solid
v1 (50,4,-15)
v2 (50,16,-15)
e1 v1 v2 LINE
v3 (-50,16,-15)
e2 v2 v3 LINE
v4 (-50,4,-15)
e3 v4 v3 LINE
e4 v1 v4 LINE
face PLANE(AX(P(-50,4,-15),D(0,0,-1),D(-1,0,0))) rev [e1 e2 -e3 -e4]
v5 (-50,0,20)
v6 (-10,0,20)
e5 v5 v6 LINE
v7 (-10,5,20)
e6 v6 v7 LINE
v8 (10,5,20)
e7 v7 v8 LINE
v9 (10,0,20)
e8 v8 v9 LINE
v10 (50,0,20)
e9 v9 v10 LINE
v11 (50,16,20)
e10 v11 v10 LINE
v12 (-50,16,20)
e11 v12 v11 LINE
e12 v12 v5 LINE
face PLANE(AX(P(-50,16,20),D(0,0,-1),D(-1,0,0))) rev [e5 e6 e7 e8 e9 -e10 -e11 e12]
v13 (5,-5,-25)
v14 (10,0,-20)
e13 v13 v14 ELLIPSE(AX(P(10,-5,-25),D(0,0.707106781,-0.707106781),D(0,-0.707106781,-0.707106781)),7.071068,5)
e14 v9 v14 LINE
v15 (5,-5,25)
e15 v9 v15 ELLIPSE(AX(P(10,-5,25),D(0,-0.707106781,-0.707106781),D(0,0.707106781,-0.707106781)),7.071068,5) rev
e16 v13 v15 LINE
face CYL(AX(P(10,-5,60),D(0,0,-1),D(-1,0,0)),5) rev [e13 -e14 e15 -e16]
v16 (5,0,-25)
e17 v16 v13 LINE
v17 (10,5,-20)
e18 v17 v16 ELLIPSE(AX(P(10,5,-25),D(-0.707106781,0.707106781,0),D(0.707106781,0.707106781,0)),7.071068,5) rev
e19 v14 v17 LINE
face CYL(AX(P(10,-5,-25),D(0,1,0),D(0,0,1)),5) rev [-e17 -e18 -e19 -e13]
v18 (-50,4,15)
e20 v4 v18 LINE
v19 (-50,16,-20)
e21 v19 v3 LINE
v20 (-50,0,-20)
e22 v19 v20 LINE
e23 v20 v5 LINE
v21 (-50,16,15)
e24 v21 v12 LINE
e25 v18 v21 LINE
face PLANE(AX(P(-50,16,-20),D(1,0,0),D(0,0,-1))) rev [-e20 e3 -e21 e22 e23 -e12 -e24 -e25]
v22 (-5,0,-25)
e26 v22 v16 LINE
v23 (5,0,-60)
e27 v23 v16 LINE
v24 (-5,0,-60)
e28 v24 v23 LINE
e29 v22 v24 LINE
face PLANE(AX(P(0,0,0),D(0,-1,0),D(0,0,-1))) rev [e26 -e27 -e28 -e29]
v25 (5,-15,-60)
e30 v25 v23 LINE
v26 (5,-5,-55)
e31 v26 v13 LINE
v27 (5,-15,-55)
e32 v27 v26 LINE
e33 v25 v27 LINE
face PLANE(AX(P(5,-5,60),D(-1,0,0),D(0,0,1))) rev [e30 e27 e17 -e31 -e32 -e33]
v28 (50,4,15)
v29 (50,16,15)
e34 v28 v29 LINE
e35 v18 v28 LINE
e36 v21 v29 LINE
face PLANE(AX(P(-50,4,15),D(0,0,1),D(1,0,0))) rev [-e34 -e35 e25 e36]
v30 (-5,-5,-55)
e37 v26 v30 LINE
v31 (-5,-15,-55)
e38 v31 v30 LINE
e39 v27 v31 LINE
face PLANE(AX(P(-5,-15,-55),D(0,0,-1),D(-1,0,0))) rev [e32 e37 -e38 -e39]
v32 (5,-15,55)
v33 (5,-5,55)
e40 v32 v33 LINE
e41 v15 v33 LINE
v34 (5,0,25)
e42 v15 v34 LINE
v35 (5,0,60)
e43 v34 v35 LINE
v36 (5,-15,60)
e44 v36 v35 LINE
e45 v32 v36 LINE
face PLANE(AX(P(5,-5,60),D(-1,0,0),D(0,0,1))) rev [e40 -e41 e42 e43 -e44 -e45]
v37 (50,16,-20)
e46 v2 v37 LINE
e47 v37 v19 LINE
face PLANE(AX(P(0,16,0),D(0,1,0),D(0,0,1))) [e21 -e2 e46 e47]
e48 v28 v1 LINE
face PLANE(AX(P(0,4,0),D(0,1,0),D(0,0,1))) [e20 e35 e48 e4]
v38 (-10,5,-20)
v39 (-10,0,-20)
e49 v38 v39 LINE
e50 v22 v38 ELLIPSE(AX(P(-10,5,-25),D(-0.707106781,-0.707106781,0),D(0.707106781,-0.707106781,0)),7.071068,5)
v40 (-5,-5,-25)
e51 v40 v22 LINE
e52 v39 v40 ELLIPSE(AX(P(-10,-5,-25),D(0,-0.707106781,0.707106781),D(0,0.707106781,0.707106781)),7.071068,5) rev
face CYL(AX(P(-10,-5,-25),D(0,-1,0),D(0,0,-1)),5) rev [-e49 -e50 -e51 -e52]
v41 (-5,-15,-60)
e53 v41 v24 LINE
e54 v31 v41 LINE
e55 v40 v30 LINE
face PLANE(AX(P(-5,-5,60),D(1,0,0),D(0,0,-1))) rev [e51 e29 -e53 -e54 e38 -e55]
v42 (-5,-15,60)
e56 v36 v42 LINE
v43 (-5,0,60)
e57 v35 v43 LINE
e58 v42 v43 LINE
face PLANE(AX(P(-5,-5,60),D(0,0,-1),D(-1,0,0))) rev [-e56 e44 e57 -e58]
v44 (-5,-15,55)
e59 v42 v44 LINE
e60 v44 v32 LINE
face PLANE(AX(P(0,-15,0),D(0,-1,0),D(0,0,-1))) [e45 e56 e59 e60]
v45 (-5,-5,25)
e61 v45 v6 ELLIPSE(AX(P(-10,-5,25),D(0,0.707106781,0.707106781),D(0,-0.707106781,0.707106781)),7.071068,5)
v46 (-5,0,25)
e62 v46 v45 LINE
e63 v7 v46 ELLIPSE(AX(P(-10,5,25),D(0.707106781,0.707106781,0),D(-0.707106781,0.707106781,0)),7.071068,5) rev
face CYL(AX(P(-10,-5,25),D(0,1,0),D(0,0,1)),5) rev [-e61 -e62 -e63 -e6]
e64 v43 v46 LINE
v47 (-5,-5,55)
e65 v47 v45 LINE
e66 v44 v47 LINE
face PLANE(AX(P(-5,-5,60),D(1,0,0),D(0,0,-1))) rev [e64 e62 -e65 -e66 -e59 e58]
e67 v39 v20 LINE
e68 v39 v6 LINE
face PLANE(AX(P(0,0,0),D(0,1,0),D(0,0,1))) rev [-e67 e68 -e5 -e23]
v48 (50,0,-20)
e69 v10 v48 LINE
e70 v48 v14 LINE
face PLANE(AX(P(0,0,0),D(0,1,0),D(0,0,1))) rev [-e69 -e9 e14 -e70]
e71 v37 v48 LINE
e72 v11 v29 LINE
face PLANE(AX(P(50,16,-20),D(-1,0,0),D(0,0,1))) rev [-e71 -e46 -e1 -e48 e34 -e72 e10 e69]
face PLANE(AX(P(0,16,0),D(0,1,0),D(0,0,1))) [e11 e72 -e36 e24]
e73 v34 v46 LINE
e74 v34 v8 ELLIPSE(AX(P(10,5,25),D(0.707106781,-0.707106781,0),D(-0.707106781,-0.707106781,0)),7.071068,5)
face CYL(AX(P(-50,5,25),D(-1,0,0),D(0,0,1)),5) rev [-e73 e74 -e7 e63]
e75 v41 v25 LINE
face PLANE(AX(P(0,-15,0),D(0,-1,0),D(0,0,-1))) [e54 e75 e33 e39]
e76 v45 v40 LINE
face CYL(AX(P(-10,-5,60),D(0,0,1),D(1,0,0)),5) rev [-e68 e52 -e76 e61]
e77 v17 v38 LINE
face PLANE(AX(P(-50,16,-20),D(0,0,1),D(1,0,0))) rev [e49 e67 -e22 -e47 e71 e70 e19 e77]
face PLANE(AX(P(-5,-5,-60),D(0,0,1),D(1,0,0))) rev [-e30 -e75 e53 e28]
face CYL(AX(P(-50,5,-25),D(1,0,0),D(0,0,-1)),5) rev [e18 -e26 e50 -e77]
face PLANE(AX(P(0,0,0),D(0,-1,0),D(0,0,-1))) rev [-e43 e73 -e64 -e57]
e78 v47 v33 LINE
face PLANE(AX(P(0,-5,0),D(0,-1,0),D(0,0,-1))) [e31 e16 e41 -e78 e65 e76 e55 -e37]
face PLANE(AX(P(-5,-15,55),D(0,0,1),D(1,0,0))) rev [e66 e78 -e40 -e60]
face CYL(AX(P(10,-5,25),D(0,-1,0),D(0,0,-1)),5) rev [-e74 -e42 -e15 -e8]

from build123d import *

# Parameters (mm, degrees)
SKETCH1_W           = 100
SKETCH1_H           = 40
BOSS_EXTRUDE2_DEPTH = 16
SKETCH3_W           = 100
SKETCH3_H           = 30
CUT_EXTRUDE1_DEPTH  = 12
SKETCH4_W           = 10
SKETCH4_H           = 120
BOSS_EXTRUDE3_DEPTH = 5
SKETCH5_W           = 10
SKETCH5_H           = 5
BOSS_EXTRUDE4_DEPTH = 10
SKETCH6_W           = 10
SKETCH6_H           = 5
BOSS_EXTRUDE5_DEPTH = 10
FILLET1_R           = 5
FILLET2_R           = 5
FILLET3_R           = 5


with BuildPart() as part:
    # Sketch1 → Boss-Extrude2 (new body)
    with BuildSketch(Plane(origin=(0, 0, 0), x_dir=(1, 0, 0), z_dir=(0, 1, 0))):
        Rectangle(SKETCH1_W, SKETCH1_H)
    extrude(amount=BOSS_EXTRUDE2_DEPTH)

    # Sketch3 → Cut-Extrude1 (cut)
    with BuildSketch(Plane(origin=(0, 16, 0), x_dir=(1, 0, 0), z_dir=(0, 1, 0))):
        Rectangle(SKETCH3_W, SKETCH3_H)
    extrude(amount=-CUT_EXTRUDE1_DEPTH, mode=Mode.SUBTRACT)

    # Sketch4 → Boss-Extrude3 (add)
    with BuildSketch(Plane(origin=(0, 0, 0), x_dir=(-1, 0, 0), z_dir=(0, -1, 0))):
        Rectangle(SKETCH4_W, SKETCH4_H)
    extrude(amount=BOSS_EXTRUDE3_DEPTH)

    # Sketch5 → Boss-Extrude4 (add)
    with BuildSketch(Plane.XZ.offset(5)):
        with Locations((0, 57.5)):
            Rectangle(SKETCH5_W, SKETCH5_H)
    extrude(amount=BOSS_EXTRUDE4_DEPTH)

    # Sketch6 → Boss-Extrude5 (add)
    with BuildSketch(Plane.XZ.offset(5)):
        with Locations((0, -57.5)):
            Rectangle(SKETCH6_W, SKETCH6_H)
    extrude(amount=BOSS_EXTRUDE5_DEPTH)

    # Fillet1
    fillet1_edges = [part.edges().sort_by_distance(p)[0] for p in [
        (5, 0, 0),
    ]]
    fillet(fillet1_edges, radius=FILLET1_R - 0.0001)  # a hair under: the kernel refuses the full size

    # Fillet2
    fillet2_edges = [part.edges().sort_by_distance(p)[0] for p in [
        (-5, 0, 0),
    ]]
    fillet(fillet2_edges, radius=FILLET2_R - 0.0001)  # a hair under: the kernel refuses the full size

    # Fillet3
    fillet3_edges = [part.edges().sort_by_distance(p)[0] for p in [
        (0, 0, 20),
        (0, 0, -20),
        (-5, -2.49995, -20),
        (-5, -2.49995, 20),
        (5, -2.49995, 20),
        (5, -2.49995, -20),
    ]]
    fillet(fillet3_edges, radius=FILLET3_R - 0.0004)  # a hair under: the kernel refuses the full size


solid = part.part
